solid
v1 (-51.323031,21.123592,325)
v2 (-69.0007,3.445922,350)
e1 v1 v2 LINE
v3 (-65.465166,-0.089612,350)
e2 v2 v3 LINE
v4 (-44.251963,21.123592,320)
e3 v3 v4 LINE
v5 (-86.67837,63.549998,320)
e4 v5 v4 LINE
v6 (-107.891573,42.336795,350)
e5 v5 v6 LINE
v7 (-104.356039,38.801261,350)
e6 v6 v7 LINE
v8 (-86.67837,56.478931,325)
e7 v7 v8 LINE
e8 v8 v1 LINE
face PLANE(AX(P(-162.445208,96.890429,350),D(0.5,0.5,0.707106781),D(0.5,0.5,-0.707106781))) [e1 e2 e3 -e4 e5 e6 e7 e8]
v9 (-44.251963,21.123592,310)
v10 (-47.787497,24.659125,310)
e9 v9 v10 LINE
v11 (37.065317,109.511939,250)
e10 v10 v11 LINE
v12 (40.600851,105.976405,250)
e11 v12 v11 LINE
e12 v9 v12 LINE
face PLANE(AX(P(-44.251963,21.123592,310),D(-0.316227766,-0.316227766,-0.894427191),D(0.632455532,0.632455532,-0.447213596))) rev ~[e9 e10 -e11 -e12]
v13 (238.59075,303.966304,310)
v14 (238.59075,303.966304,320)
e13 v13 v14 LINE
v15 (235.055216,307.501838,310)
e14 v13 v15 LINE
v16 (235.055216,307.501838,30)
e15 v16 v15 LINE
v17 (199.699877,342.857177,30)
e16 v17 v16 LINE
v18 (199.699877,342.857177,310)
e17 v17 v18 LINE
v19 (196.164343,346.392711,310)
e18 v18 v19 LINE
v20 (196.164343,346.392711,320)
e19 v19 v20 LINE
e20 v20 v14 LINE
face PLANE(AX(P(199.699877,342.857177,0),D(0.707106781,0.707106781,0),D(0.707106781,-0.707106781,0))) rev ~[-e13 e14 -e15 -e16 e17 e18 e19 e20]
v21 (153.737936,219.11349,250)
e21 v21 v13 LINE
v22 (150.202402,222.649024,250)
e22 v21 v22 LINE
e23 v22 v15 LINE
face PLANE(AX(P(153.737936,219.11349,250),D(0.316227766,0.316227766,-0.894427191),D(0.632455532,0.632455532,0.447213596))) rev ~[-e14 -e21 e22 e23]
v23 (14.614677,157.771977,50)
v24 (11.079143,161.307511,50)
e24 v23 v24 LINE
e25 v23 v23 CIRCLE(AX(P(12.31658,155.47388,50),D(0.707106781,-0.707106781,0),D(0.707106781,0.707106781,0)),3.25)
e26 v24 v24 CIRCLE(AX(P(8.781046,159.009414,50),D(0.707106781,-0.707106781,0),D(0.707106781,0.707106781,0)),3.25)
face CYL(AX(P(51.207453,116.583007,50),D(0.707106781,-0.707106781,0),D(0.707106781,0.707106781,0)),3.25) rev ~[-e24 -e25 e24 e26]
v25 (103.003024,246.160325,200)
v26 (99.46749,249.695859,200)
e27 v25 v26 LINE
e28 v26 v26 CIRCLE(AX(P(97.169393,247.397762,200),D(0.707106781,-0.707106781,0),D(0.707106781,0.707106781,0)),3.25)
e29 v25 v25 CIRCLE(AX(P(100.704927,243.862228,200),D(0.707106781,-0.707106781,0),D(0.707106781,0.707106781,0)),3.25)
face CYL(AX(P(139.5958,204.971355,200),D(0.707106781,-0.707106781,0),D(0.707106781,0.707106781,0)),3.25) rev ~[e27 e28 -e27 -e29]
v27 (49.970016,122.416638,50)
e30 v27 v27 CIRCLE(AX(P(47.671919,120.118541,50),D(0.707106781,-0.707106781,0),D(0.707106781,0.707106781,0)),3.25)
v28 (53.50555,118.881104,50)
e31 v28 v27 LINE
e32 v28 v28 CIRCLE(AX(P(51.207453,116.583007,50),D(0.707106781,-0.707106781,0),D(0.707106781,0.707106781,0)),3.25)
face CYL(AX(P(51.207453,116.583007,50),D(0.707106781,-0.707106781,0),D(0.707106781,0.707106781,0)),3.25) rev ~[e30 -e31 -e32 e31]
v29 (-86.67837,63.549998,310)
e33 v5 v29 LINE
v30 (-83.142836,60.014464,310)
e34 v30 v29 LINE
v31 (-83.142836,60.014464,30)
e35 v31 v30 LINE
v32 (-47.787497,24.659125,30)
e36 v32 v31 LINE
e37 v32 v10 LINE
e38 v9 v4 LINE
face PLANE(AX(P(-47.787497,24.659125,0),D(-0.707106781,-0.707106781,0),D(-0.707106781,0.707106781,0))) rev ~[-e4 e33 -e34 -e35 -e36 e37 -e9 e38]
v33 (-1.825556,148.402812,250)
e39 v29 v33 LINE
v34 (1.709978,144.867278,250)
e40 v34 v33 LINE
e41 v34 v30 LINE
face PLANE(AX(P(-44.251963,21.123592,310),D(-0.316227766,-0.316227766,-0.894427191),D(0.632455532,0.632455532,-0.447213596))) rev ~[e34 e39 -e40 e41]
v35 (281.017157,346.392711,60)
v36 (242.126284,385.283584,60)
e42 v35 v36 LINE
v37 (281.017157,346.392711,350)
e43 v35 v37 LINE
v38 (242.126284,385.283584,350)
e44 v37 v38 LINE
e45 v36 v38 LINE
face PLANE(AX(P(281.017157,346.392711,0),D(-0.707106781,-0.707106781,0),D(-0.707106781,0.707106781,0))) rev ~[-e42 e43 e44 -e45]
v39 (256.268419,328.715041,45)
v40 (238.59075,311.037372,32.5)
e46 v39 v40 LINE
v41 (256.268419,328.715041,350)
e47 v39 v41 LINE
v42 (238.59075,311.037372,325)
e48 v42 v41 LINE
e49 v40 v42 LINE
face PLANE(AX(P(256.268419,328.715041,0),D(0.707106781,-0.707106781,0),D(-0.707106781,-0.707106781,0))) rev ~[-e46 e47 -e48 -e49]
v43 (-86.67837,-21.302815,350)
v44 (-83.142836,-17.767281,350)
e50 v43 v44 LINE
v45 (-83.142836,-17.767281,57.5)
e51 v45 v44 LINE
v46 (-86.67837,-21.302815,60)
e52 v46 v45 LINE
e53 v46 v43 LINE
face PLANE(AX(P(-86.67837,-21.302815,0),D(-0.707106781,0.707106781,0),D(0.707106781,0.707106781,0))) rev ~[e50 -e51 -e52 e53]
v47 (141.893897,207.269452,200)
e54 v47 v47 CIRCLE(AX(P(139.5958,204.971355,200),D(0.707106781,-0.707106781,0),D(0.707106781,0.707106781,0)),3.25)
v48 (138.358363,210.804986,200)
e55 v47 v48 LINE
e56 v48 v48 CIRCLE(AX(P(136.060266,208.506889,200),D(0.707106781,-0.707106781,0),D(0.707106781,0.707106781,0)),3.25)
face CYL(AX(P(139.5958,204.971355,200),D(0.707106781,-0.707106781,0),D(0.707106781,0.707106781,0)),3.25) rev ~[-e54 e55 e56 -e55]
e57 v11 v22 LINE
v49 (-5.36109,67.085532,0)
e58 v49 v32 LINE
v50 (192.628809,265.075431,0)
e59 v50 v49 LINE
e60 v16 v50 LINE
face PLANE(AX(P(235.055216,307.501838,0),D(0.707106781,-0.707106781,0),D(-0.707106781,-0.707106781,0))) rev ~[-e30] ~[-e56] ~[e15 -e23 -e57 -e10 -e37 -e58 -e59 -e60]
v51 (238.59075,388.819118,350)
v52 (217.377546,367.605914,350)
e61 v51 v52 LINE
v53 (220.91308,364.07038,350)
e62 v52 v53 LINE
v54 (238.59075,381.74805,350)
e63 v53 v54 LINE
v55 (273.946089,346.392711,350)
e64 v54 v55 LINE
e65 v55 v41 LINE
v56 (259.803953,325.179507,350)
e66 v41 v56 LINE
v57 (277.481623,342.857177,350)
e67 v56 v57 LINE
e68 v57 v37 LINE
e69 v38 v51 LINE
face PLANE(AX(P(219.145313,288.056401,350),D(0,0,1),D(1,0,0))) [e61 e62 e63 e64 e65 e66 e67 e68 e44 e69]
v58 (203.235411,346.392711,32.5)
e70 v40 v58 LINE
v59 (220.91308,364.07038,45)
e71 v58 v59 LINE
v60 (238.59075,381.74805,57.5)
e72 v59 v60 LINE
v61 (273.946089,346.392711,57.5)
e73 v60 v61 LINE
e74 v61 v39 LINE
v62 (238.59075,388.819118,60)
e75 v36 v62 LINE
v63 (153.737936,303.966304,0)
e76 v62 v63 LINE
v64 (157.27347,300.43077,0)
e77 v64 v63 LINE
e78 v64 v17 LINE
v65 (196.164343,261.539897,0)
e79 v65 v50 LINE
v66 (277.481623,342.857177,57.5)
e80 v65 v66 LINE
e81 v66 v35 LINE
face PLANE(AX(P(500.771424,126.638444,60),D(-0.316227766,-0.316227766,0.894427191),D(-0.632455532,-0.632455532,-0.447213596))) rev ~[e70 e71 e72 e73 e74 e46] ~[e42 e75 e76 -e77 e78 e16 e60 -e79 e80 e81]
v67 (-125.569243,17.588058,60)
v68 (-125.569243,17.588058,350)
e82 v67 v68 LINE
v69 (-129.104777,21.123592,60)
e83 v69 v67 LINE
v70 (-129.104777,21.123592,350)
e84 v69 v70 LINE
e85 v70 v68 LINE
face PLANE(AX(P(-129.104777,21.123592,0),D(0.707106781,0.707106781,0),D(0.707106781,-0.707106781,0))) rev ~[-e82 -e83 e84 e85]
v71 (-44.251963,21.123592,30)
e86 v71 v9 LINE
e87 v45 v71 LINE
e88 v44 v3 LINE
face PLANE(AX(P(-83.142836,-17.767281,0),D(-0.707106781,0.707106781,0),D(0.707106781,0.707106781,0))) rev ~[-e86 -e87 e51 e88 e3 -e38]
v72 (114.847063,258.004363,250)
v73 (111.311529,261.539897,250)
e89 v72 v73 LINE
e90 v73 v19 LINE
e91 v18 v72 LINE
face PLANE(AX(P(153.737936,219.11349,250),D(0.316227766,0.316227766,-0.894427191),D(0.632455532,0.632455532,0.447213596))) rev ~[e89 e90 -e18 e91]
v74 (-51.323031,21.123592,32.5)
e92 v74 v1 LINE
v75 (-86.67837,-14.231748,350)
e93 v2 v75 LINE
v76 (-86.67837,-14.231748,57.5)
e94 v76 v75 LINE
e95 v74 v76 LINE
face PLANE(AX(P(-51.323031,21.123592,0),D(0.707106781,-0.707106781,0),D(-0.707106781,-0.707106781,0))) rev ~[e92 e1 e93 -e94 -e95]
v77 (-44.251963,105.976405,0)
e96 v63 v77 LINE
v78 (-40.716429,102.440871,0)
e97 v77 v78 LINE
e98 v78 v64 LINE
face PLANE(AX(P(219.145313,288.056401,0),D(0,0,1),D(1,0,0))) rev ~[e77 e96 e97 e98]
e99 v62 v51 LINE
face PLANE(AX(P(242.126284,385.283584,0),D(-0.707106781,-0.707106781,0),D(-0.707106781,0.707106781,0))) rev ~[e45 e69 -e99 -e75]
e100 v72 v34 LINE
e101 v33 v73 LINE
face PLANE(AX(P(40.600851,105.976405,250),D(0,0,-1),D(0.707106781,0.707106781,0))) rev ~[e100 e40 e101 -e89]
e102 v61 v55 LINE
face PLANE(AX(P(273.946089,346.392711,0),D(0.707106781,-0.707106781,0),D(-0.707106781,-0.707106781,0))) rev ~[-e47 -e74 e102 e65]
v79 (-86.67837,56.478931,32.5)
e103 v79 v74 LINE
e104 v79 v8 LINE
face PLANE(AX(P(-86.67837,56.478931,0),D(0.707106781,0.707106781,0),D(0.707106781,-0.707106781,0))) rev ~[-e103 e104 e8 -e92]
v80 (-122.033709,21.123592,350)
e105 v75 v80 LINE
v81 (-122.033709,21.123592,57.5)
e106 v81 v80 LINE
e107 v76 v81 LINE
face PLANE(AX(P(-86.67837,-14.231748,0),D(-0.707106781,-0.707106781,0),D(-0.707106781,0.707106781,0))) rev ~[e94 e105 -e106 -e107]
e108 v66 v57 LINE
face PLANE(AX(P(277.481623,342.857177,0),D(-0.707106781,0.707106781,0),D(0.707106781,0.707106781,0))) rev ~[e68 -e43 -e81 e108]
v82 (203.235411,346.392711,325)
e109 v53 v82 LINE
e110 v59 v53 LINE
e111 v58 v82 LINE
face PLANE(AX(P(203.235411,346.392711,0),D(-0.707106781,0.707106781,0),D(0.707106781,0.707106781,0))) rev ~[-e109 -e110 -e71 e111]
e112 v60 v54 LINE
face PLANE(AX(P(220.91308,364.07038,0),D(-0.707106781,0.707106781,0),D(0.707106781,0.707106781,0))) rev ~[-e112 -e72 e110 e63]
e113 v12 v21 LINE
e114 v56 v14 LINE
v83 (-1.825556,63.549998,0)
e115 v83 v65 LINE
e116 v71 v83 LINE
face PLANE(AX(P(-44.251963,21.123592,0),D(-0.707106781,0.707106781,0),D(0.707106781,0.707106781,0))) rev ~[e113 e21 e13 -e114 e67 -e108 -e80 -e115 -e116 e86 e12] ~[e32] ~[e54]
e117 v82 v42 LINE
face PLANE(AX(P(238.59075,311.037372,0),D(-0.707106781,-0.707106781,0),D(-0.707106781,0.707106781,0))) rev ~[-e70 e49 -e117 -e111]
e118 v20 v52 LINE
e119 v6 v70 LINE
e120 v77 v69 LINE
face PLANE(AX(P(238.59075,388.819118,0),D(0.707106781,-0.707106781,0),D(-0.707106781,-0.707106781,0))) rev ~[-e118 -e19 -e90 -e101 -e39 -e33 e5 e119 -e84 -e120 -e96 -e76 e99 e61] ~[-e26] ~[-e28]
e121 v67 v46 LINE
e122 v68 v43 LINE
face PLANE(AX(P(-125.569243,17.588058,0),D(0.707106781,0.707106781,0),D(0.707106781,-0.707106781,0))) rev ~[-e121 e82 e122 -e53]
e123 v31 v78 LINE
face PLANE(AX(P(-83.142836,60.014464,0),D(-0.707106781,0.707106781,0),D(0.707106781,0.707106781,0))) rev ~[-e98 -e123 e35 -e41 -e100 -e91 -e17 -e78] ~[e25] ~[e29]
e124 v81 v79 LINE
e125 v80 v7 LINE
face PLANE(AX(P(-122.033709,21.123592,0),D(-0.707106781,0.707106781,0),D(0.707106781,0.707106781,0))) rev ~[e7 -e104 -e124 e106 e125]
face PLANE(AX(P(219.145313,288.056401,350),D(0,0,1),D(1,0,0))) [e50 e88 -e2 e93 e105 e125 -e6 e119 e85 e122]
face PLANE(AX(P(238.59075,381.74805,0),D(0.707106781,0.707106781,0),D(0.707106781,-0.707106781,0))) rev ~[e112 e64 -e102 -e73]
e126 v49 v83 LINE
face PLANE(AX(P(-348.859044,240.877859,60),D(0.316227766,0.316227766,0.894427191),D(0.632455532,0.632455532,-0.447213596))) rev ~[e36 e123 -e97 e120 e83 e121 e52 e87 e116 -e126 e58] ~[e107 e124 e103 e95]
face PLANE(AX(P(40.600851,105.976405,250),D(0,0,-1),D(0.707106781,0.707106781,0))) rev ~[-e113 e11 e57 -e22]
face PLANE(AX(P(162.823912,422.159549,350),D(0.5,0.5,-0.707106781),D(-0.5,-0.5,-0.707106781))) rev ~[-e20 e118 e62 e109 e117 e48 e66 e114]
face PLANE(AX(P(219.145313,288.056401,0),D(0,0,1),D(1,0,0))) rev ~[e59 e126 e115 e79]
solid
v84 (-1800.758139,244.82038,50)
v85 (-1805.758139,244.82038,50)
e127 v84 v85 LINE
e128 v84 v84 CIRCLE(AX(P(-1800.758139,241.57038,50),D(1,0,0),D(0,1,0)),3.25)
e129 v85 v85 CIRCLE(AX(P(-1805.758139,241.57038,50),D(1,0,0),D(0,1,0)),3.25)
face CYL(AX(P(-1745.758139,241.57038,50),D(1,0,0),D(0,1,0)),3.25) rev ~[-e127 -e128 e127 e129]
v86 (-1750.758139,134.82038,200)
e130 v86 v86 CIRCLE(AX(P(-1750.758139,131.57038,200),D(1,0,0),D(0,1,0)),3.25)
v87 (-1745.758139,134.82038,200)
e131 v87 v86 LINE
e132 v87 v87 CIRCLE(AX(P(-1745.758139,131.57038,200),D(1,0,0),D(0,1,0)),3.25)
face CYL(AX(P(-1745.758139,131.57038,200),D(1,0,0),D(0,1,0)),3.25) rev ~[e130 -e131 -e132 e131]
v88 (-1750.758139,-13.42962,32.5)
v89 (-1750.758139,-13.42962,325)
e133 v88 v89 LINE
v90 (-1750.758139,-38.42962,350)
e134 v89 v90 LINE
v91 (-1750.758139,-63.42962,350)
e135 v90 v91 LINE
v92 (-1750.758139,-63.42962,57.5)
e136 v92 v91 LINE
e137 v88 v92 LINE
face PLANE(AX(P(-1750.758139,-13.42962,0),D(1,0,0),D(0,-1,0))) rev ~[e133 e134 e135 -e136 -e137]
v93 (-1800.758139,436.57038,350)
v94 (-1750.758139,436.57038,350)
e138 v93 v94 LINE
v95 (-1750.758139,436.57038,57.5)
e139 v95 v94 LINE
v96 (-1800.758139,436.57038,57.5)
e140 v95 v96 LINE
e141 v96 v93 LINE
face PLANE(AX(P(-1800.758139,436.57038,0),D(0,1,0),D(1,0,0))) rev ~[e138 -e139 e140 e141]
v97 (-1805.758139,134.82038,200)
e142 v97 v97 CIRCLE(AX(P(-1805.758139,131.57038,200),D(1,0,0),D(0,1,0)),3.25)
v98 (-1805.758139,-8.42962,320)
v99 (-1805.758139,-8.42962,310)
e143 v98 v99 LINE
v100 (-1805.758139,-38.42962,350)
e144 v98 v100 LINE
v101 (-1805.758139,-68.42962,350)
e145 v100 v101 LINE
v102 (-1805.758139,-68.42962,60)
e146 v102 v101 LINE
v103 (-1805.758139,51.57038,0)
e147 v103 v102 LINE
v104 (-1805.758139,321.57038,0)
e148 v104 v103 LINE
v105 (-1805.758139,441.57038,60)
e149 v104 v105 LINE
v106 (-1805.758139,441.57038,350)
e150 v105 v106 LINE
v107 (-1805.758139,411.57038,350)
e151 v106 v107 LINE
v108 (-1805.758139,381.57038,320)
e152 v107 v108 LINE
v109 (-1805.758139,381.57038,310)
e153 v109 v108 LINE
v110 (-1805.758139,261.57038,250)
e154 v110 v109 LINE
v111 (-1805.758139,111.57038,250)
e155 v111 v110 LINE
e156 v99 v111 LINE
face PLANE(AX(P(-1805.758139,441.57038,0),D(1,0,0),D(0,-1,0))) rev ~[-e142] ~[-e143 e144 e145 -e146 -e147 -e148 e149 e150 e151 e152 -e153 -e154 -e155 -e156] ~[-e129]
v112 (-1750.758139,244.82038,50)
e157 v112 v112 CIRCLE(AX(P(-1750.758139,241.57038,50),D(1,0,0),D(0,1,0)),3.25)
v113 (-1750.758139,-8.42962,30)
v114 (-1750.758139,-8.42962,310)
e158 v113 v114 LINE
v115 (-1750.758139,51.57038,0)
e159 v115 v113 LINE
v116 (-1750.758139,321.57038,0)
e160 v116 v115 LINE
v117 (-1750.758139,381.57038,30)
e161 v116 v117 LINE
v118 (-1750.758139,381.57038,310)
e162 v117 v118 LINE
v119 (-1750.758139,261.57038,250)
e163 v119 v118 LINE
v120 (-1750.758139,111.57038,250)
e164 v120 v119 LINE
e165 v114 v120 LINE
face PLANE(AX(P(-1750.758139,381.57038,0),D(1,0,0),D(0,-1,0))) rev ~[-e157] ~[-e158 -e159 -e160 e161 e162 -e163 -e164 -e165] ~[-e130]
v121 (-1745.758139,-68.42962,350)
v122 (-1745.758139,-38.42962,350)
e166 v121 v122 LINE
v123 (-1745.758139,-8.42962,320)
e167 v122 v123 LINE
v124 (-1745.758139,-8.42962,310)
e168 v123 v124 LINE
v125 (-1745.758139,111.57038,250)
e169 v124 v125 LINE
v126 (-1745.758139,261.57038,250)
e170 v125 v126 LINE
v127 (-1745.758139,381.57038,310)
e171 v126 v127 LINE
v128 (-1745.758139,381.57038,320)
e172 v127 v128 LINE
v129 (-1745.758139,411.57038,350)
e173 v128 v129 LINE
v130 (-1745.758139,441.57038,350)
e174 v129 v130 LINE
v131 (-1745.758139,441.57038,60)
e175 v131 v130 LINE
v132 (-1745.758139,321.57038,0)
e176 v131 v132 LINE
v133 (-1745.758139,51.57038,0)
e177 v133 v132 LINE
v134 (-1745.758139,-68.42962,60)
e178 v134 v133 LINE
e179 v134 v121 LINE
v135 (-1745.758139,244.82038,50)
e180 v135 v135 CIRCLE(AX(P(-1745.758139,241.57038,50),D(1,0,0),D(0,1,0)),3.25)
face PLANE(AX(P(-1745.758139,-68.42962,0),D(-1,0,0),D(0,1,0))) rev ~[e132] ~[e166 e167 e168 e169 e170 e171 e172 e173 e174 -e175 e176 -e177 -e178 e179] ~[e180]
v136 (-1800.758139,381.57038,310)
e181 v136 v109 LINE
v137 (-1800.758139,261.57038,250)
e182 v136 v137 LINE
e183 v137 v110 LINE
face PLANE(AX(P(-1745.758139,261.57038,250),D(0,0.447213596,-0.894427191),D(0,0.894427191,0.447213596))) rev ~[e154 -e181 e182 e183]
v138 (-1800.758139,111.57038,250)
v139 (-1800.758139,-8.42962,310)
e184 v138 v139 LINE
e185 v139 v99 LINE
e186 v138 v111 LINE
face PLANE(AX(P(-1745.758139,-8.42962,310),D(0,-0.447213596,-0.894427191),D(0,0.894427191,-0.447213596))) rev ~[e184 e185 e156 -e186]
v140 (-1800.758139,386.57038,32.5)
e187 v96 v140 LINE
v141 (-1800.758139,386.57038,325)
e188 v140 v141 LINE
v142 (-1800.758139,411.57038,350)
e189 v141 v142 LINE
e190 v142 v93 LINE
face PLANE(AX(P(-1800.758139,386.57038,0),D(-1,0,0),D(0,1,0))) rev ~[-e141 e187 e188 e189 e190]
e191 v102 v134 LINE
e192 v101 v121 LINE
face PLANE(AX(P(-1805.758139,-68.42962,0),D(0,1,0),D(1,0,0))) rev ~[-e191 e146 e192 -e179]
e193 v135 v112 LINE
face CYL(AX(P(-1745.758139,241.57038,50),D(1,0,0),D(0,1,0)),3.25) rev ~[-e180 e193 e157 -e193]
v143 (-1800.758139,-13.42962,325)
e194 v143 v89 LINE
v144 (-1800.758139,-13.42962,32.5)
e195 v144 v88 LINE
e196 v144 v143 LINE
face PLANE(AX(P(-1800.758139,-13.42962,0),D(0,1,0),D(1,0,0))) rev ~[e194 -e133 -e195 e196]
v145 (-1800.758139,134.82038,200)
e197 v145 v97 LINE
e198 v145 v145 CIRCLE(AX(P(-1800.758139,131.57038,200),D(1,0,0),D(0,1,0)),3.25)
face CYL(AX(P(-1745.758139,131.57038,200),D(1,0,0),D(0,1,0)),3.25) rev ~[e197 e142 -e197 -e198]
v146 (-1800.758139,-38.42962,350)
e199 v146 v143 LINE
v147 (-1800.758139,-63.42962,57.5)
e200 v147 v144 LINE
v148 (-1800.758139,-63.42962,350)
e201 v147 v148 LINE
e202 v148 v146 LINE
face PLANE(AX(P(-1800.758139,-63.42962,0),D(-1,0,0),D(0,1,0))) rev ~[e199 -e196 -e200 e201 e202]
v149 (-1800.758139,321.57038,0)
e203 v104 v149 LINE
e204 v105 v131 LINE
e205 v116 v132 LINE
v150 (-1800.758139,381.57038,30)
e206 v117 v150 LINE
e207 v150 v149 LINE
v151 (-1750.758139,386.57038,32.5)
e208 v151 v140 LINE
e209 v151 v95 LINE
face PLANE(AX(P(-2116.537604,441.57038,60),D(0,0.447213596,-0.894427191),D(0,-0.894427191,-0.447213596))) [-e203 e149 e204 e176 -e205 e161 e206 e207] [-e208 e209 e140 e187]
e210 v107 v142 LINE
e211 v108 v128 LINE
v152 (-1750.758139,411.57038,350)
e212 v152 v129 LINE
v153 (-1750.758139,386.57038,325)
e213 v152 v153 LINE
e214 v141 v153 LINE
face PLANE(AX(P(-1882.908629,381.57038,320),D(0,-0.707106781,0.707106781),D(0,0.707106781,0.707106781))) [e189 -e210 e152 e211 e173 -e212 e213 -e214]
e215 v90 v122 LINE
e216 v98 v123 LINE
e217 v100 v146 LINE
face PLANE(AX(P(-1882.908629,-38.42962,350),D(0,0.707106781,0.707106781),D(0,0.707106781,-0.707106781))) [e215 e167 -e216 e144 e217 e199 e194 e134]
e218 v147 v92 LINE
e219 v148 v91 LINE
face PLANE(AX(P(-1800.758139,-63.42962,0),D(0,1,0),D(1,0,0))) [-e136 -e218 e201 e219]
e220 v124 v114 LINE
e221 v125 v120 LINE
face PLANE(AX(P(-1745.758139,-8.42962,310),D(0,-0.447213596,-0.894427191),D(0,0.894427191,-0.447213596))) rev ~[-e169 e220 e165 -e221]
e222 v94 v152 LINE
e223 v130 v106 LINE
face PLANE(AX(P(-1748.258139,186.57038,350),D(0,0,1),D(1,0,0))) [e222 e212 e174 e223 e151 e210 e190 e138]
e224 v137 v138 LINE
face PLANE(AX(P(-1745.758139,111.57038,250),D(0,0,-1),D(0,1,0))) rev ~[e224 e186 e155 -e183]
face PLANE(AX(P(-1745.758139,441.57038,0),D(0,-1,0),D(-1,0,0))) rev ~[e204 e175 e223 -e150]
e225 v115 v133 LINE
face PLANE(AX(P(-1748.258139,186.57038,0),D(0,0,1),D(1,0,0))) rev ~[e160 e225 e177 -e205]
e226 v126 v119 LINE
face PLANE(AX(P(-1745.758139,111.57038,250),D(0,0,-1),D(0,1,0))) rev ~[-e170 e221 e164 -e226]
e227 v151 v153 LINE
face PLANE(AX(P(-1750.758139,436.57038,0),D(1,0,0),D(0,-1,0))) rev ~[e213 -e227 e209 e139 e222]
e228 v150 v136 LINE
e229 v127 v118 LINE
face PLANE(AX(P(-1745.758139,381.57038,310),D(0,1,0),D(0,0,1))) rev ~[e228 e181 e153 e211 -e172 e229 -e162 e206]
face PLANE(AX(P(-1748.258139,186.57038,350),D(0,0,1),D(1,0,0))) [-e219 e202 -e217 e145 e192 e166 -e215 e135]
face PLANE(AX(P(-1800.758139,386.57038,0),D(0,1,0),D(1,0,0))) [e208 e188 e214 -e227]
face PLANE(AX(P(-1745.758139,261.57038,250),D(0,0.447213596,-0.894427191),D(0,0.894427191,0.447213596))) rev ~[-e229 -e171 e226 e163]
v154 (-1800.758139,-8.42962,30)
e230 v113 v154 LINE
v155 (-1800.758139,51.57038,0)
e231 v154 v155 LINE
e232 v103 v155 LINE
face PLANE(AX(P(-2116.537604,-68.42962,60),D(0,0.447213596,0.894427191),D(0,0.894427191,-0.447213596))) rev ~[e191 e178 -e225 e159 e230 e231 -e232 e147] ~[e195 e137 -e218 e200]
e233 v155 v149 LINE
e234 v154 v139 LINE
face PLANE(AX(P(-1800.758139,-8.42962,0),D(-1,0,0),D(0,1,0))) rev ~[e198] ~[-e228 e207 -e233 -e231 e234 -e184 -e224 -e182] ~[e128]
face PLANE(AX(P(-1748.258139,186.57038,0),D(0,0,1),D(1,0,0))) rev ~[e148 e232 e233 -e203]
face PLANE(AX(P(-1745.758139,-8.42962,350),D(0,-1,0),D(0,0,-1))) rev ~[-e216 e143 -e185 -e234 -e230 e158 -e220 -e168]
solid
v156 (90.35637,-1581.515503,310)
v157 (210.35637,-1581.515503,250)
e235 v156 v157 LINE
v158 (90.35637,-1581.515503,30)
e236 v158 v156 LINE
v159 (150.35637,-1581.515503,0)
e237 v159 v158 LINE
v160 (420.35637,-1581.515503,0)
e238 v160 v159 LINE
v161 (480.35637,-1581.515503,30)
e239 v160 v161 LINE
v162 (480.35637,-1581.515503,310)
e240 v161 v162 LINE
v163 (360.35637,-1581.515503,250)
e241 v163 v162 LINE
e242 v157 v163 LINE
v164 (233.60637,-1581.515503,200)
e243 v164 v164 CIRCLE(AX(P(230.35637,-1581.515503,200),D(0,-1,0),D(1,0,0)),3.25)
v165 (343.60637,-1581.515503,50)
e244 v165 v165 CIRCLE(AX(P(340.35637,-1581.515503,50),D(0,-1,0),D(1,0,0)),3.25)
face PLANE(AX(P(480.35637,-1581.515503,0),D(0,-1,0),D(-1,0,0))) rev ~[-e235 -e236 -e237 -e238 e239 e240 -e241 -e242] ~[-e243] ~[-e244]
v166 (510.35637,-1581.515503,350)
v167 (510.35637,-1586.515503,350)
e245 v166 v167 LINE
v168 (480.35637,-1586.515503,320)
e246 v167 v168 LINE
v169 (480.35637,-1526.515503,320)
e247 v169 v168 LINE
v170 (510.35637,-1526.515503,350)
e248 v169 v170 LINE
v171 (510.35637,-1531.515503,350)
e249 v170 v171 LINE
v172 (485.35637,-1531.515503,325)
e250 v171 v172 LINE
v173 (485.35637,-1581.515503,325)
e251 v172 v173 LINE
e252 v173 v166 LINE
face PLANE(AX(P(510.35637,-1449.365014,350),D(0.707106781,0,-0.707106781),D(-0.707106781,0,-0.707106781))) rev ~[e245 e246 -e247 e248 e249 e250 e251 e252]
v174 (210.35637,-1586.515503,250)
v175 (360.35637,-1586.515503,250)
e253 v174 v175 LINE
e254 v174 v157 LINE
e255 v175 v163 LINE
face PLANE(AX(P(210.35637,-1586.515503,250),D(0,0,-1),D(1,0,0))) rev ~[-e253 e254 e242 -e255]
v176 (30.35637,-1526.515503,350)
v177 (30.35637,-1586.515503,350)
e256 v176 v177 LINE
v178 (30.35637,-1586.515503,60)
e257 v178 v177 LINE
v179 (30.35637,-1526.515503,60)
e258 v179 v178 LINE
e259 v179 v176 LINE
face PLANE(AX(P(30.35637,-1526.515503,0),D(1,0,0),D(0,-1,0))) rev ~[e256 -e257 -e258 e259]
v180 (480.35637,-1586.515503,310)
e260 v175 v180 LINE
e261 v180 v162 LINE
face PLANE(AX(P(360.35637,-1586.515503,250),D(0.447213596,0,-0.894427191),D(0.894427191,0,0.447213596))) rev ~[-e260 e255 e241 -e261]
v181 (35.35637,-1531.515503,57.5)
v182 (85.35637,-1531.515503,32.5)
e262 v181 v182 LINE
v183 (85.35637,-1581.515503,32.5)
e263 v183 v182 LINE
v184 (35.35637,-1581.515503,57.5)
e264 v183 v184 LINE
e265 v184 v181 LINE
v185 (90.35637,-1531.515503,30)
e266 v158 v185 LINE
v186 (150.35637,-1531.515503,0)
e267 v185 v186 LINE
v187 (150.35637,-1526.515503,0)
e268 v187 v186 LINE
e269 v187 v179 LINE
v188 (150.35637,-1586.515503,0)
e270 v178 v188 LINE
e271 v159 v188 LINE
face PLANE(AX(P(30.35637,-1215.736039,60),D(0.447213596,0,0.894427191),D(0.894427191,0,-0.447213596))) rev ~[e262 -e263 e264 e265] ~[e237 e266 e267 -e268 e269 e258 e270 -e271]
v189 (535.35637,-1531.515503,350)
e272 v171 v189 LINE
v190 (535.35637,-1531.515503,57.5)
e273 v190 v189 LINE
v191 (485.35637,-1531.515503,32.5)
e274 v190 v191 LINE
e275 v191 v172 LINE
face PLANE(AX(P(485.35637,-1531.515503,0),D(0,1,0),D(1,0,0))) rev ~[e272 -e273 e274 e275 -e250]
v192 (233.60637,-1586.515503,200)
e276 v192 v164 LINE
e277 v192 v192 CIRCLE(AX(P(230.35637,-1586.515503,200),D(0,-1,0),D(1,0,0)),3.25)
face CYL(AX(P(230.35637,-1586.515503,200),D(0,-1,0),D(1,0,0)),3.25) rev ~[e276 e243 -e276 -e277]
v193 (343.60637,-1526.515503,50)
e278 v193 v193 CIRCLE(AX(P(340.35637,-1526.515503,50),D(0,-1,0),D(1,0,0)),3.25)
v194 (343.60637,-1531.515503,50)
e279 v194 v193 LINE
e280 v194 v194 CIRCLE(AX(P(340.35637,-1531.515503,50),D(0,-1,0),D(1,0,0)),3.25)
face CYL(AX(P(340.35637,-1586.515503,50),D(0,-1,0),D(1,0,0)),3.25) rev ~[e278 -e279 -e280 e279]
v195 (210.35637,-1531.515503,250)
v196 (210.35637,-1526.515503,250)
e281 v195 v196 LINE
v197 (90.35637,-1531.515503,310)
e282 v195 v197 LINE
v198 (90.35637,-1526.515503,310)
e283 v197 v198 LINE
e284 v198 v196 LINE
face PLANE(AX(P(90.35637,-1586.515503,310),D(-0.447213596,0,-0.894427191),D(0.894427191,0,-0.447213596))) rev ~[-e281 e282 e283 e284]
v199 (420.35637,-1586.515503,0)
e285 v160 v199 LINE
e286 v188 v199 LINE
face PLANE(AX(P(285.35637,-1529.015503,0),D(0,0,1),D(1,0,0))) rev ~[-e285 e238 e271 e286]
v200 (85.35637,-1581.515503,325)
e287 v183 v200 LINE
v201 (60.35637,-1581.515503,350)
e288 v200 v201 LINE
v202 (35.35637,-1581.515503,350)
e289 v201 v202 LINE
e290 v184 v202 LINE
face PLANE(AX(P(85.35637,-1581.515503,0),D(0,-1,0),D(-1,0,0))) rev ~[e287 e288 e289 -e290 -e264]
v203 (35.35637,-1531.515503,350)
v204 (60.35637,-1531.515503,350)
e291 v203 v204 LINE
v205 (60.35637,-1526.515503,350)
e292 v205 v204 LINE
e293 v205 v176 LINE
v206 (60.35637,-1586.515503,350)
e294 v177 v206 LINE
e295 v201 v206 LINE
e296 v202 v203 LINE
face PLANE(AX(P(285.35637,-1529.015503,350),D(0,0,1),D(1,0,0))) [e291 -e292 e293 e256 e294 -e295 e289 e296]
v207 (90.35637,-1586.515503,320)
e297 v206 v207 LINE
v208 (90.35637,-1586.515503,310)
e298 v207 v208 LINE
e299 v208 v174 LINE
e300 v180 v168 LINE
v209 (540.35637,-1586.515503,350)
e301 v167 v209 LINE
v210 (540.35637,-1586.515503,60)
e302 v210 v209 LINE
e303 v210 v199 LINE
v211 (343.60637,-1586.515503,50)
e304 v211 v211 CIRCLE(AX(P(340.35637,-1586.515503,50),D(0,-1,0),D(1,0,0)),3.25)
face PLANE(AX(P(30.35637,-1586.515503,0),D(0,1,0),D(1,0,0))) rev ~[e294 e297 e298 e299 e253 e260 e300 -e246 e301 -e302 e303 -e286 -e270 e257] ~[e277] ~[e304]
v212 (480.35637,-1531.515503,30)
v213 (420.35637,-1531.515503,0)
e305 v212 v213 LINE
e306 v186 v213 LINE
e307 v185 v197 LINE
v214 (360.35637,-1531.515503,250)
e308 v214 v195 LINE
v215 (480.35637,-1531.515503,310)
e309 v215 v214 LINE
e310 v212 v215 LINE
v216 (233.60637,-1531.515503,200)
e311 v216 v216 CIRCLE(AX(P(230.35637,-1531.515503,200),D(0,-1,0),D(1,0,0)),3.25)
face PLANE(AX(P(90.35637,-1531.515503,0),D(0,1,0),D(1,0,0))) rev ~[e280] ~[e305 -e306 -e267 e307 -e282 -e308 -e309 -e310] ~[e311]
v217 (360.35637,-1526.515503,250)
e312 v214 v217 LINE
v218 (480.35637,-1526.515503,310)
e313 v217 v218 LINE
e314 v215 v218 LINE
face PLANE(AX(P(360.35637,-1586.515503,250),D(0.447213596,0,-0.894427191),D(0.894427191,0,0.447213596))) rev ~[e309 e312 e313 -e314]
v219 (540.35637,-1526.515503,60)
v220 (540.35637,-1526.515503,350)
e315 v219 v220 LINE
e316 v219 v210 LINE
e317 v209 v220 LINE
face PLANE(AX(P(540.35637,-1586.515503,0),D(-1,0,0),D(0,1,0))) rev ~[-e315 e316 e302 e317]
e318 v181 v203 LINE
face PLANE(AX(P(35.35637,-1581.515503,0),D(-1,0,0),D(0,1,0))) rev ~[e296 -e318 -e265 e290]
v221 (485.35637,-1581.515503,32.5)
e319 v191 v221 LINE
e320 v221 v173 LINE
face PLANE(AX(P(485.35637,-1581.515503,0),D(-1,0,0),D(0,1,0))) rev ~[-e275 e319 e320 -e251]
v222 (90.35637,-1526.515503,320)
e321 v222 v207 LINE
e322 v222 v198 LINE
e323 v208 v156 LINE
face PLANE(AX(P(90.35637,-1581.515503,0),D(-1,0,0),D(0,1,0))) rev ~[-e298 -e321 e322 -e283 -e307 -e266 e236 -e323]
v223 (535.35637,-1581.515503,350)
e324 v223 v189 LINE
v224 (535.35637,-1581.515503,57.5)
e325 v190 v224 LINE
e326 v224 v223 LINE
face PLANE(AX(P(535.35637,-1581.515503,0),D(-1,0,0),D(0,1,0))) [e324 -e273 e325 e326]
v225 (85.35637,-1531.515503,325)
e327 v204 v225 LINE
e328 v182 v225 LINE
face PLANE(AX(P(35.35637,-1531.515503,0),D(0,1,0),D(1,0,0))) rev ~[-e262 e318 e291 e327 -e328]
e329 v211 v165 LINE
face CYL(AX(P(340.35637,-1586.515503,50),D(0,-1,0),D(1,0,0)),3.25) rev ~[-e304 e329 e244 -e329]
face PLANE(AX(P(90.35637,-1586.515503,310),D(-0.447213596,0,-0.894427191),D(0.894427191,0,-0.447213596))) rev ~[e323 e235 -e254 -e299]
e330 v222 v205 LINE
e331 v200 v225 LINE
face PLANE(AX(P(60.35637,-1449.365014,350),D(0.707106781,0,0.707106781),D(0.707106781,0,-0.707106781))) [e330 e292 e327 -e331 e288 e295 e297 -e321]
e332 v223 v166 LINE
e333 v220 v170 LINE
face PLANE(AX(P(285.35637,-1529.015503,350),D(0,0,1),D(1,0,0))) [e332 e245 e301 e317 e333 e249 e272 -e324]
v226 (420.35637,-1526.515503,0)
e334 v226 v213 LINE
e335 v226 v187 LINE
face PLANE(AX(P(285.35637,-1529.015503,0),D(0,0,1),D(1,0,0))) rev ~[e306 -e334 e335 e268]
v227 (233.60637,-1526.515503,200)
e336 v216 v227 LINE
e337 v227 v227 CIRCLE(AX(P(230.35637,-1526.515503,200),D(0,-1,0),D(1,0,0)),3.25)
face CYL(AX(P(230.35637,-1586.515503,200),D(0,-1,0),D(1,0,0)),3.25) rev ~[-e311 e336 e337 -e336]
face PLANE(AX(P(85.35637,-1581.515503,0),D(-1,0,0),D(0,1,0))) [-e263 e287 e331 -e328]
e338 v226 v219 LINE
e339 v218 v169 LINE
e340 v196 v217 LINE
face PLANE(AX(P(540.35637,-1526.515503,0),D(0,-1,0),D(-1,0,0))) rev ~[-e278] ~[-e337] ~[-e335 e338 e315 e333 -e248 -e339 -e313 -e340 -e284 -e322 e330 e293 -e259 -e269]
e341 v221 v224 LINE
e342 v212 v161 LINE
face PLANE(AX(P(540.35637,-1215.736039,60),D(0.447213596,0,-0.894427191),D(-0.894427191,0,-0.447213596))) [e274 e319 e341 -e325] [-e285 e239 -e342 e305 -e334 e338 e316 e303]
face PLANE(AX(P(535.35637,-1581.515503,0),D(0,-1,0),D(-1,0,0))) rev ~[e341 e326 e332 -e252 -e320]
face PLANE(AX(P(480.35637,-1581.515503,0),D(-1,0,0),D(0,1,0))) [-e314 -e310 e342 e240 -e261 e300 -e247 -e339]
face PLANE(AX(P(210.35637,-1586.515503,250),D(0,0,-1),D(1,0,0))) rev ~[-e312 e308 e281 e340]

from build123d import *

# Parameters (mm, degrees)
F0_W          = 390
F0_H          = 5
F0_W_2        = 5
F0_H_2        = 50
F1_DEPTH      = 350
F0_H_3        = 390
F0_W_3        = 50
F2_R          = 3.25
F3_DEPTH      = 100
F4_R          = 3.25
F5_DEPTH      = 100
F6_R          = 3.25
F7_DEPTH      = 100
F8_T1_DEPTH   = 681.5589297088
F8_2_T1_DEPTH = 681.5589297088
F8_2_T3_DEPTH = 681.5589297088
F8_3_T1_DEPTH = 681.5589297088
F9_T1_DEPTH   = 214.3009792779
F9_2_T1_DEPTH = 214.300979278
F9_3_T1_DEPTH = 214.300979278


# Not quite as in the source:
# - a fillet or chamfer that OpenCascade refuses, or shapes differently, is made with other operations: its cross-section is extruded or revolved along the edge and cut away or added


with BuildPart() as f1:
    # F0 (on Top) → F1 (new body)
    with BuildSketch(Plane.XY):
        Polygon((90.3563703896, -1526.5155034513), (90.3563703896, -1531.5155034513), (480.3563703896, -1531.5155034513), (480.3563703896, -1526.5155034513), (460.3563703896, -1526.5155034513), (410.3563703896, -1526.5155034513), (160.3563703896, -1526.5155034513), (110.3563703896, -1526.5155034513), align=None)
        with Locations((285.3563703896, -1584.0155034513)):
            Rectangle(F0_W, F0_H)
        with Locations((87.8563703896, -1556.5155034513)):
            Rectangle(F0_W_2, F0_H_2)
        Polygon((30.3563703896, -1526.5155034513), (30.3563703896, -1531.5155034513), (35.3563703896, -1531.5155034513), (85.3563703896, -1531.5155034513), (90.3563703896, -1531.5155034513), (90.3563703896, -1526.5155034513), align=None)
        with Locations((32.8563703896, -1556.5155034513)):
            Rectangle(F0_W_2, F0_H_2)
        Polygon((30.3563703896, -1581.5155034513), (30.3563703896, -1586.5155034513), (90.3563703896, -1586.5155034513), (90.3563703896, -1581.5155034513), (85.3563703896, -1581.5155034513), (35.3563703896, -1581.5155034513), align=None)
        Polygon((480.3563703896, -1581.5155034513), (480.3563703896, -1586.5155034513), (540.3563703896, -1586.5155034513), (540.3563703896, -1581.5155034513), (535.3563703896, -1581.5155034513), (485.3563703896, -1581.5155034513), align=None)
        with Locations((482.8563703896, -1556.5155034513)):
            Rectangle(F0_W_2, F0_H_2)
        Polygon((480.3563703896, -1526.5155034513), (480.3563703896, -1531.5155034513), (485.3563703896, -1531.5155034513), (535.3563703896, -1531.5155034513), (540.3563703896, -1531.5155034513), (540.3563703896, -1526.5155034513), align=None)
        with Locations((537.8563703896, -1556.5155034513)):
            Rectangle(F0_W_2, F0_H_2)
    extrude(amount=F1_DEPTH)

    # F6 (on face) → F7 (cut)
    with BuildSketch(Plane.XZ.offset(1586.5155034513)):
        with Locations((230.3563703896, 200)):
            Circle(F6_R)
        with Locations((340.3563703896, 50)):
            Circle(F6_R)
        Polygon((480.3563703896, 350), (90.3563703896, 350), (90.3563703896, 310), (210.3563703896, 250), (360.3563703896, 250), (480.3563703896, 310), align=None)
    extrude(amount=-F7_DEPTH, mode=Mode.SUBTRACT)

    # F8: chamfer of 60 x 120 on 2 edges, made by hand

    # F8_s2 → F8_t1 (cut)
    with BuildSketch(Plane.XZ.offset(1215.7360385969)):
        Polygon((540.3563703896, 60), (420.3563703896, 0), (540.3563703896, 0), align=None)
        Polygon((30.3563703896, 60), (150.3563703896, 0), (30.3563703896, 0), align=None)
    extrude(amount=F8_T1_DEPTH, mode=Mode.SUBTRACT)

    # F9: chamfer of 30 on 2 edges, made by hand

    # F9_s2 → F9_t1 (cut)
    with BuildSketch(Plane.XZ.offset(1449.3650138123)):
        Polygon((510.3563703896, 350), (480.3563703896, 320), (480.3563703896, 350), align=None)
        Polygon((60.3563703896, 350), (90.3563703896, 320), (90.3563703896, 350), align=None)
    extrude(amount=F9_T1_DEPTH, mode=Mode.SUBTRACT)


with BuildPart() as f1b:
    # F0 (on Top) → F1, piece 2 (new body)
    with BuildSketch(Plane.XY):
        Polygon((215.6097792881, 288.056401427), (219.145313194, 284.520867521), (222.6808471, 288.056401427), (219.145313194, 291.5919353329), align=None)
        Polygon((197.9321097584, 270.3787318973), (201.4676436644, 266.8431979914), (219.145313194, 284.520867521), (215.6097792881, 288.056401427), align=None)
        Polygon((176.7189063228, 326.9472743922), (159.0412367932, 309.2696048626), (162.5767706991, 305.7340709566), (180.2544402288, 323.4117404863), align=None)
        Polygon((180.2544402288, 330.4828082982), (176.7189063228, 326.9472743922), (180.2544402288, 323.4117404863), (183.7899741347, 326.9472743922), align=None)
        Polygon((-44.251962798, 21.1235915291), (201.4676436644, 266.8431979914), (197.9321097584, 270.3787318973), (-47.7874967039, 24.659125435), align=None)
        Polygon((162.5767706991, 305.7340709566), (159.0412367932, 309.2696048626), (-86.6783696692, 63.5499984002), (-83.1428357632, 60.0144644943), align=None)
        Polygon((196.1643428055, 346.3927108749), (180.2544402288, 330.4828082982), (183.7899741347, 326.9472743922), (199.6998767114, 342.8571769689), align=None)
        Polygon((219.145313194, 291.5919353329), (222.6808471, 288.056401427), (238.5907496767, 303.9663040037), (235.0552157707, 307.5018379096), align=None)
        Polygon((-47.7874967039, 24.659125435), (-83.1428357632, 60.0144644943), (-86.6783696692, 56.4789305884), (-51.3230306098, 21.123591529), align=None)
        Polygon((-86.6783696692, 63.5499984002), (-125.5692426344, 24.659125435), (-122.0337087285, 21.123591529), (-86.6783696692, 56.4789305884), (-83.1428357632, 60.0144644943), align=None)
        Polygon((-122.0337087285, 21.123591529), (-125.5692426344, 17.5880576231), (-90.2139035751, -17.7672814362), (-86.6783696692, -14.2317475303), align=None)
        Polygon((-125.5692426344, 24.659125435), (-129.1047765404, 21.123591529), (-125.5692426344, 17.5880576231), (-122.0337087285, 21.123591529), align=None)
        Polygon((-90.2139035751, -17.7672814362), (-86.6783696692, -21.3028153421), (-83.1428357632, -17.7672814362), (-86.6783696692, -14.2317475303), align=None)
        Polygon((-86.6783696692, -14.2317475303), (-83.1428357632, -17.7672814362), (-44.251962798, 21.1235915291), (-47.7874967039, 24.659125435), (-51.3230306098, 21.123591529), align=None)
        Polygon((235.0552157707, 385.2835838401), (196.1643428055, 346.3927108749), (199.6998767114, 342.8571769689), (203.2354106173, 346.3927108749), (220.913080147, 364.0703804045), (238.5907496767, 381.7480499342), align=None)
        Polygon((203.2354106173, 346.3927108749), (199.6998767114, 342.8571769689), (235.0552157707, 307.5018379096), (238.5907496767, 311.0373718155), align=None)
        Polygon((235.0552157707, 307.5018379096), (238.5907496767, 303.9663040037), (277.4816226419, 342.8571769689), (273.946088736, 346.3927108749), (256.2684192063, 328.7150413452), (238.5907496767, 311.0373718155), align=None)
        Polygon((273.946088736, 346.3927108749), (277.4816226419, 342.8571769689), (281.0171565478, 346.3927108749), (277.4816226419, 349.9282447808), align=None)
        Polygon((242.1262835826, 385.2835838401), (238.5907496767, 381.7480499342), (273.946088736, 346.3927108749), (277.4816226419, 349.9282447808), align=None)
        Polygon((238.5907496767, 388.8191177461), (235.0552157707, 385.2835838401), (238.5907496767, 381.7480499342), (242.1262835826, 385.2835838401), align=None)
    extrude(amount=F1_DEPTH)

    # F2 (on face) → F3 (cut)
    with BuildSketch(Plane(origin=(-32.6877771635, 32.6877771635, 0), x_dir=(0.7071067812, 0.7071067812, 0), z_dir=(0.7071067812, -0.7071067812, 0))):
        with Locations((118.6457718379, 50)):
            Circle(F2_R)
        with Locations((243.6457718379, 200)):
            Circle(F2_R)
        Polygon((383.6457718379, 350), (-16.3542281621, 350), (-16.3542281621, 310), (103.6457718379, 250), (263.6457718379, 250), (383.6457718379, 310), align=None)
    extrude(amount=-F3_DEPTH, mode=Mode.SUBTRACT)

    # F8#2: chamfer of 60 x 120 on 2 edges, made by hand

    # F8_2_s2 → F8_2_t1 (cut)
    with BuildSketch(Plane(origin=(187.0664898886, -187.0664898886, 0), x_dir=(0, 0, 1), z_dir=(-0.7071067812, 0.7071067812, 0))):
        Polygon((60, 443.6457718379), (0, 323.6457718379), (0, 443.6457718379), align=None)
    extrude(amount=F8_2_T1_DEPTH, mode=Mode.SUBTRACT)

    # F8_2_s4 → F8_2_t3 (cut)
    with BuildSketch(Plane(origin=(-294.8684510868, 294.8684510868, 0), x_dir=(0, 0, 1), z_dir=(0.7071067812, -0.7071067812, 0))):
        Polygon((60, 76.3542281621), (0, -43.6457718379), (0, 76.3542281621), align=None)
    extrude(amount=F8_2_T3_DEPTH, mode=Mode.SUBTRACT)

    # F9#2: chamfer of 30 on 2 edges, made by hand

    # F9_2_s2 → F9_2_t1 (cut)
    with BuildSketch(Plane(origin=(-129.6678184303, 129.6678184303, 0), x_dir=(0, 0, 1), z_dir=(0.7071067812, -0.7071067812, 0))):
        Polygon((350, 46.3542281621), (320, 16.3542281621), (350, 16.3542281621), align=None)
        Polygon((350, -413.6457718379), (320, -383.6457718379), (350, -383.6457718379), align=None)
    extrude(amount=F9_2_T1_DEPTH, mode=Mode.SUBTRACT)


with BuildPart() as f1c:
    # F0 (on Top) → F1, piece 3 (new body)
    with BuildSketch(Plane.XY):
        Polygon((-1745.7581393137, -8.4296195955), (-1745.7581393137, 11.5703804045), (-1745.7581393137, 49.0703804045), (-1745.7581393137, 61.5703804045), (-1745.7581393137, 311.5703804045), (-1745.7581393137, 324.0703804045), (-1745.7581393137, 349.0703804045), (-1745.7581393137, 361.5703804045), (-1745.7581393137, 381.5703804045), (-1750.7581393137, 381.5703804045), (-1750.7581393137, -8.4296195955), align=None)
        with Locations((-1803.2581393137, 186.5703804045)):
            Rectangle(F0_W_2, F0_H_3)
        Polygon((-1805.7581393137, 381.5703804045), (-1800.7581393137, 381.5703804045), (-1800.7581393137, 386.5703804045), (-1800.7581393137, 436.5703804045), (-1800.7581393137, 441.5703804045), (-1805.7581393137, 441.5703804045), align=None)
        with Locations((-1775.7581393137, 439.0703804045)):
            Rectangle(F0_W_3, F0_H)
        Polygon((-1750.7581393137, 381.5703804045), (-1745.7581393137, 381.5703804045), (-1745.7581393137, 441.5703804045), (-1750.7581393137, 441.5703804045), (-1750.7581393137, 436.5703804045), (-1750.7581393137, 386.5703804045), align=None)
        with Locations((-1775.7581393137, 384.0703804045)):
            Rectangle(F0_W_3, F0_H)
        Polygon((-1800.7581393137, -13.4296195955), (-1800.7581393137, -8.4296195955), (-1805.7581393137, -8.4296195955), (-1805.7581393137, -63.4296195955), (-1800.7581393137, -63.4296195955), align=None)
        with Locations((-1775.7581393137, -10.9296195955)):
            Rectangle(F0_W_3, F0_H)
        Polygon((-1745.7581393137, -63.4296195955), (-1745.7581393137, -8.4296195955), (-1750.7581393137, -8.4296195955), (-1750.7581393137, -13.4296195955), (-1750.7581393137, -63.4296195955), align=None)
        with Locations((-1748.2581393137, -65.9296195955)):
            Rectangle(F0_W_2, F0_H)
        with Locations((-1775.7581393137, -65.9296195955)):
            Rectangle(F0_W_3, F0_H)
        with Locations((-1803.2581393137, -65.9296195955)):
            Rectangle(F0_W_2, F0_H)
    extrude(amount=F1_DEPTH)

    # F4 (on face) → F5 (cut)
    with BuildSketch(Plane.YZ.offset(-1745.7581393137)):
        with Locations((131.5703804045, 200)):
            Circle(F4_R)
        with Locations((241.5703804045, 50)):
            Circle(F4_R)
        Polygon((381.5703804045, 310), (381.5703804045, 350), (-8.4296195955, 350), (-8.4296195955, 310), (111.5703804045, 250), (261.5703804045, 250), align=None)
    extrude(amount=-F5_DEPTH, mode=Mode.SUBTRACT)

    # F8#3: chamfer of 60 x 120 on 2 edges, made by hand

    # F8_3_s2 → F8_3_t1 (cut)
    with BuildSketch(Plane.YZ.offset(-2116.5376041681)):
        Polygon((441.5703804045, 60), (321.5703804045, 0), (441.5703804045, 0), align=None)
        Polygon((-68.4296195955, 60), (51.5703804045, 0), (-68.4296195955, 0), align=None)
    extrude(amount=F8_3_T1_DEPTH, mode=Mode.SUBTRACT)

    # F9#3: chamfer of 30 on 2 edges, made by hand

    # F9_3_s2 → F9_3_t1 (cut)
    with BuildSketch(Plane.YZ.offset(-1882.9086289527)):
        Polygon((-38.4296195955, 350), (-8.4296195955, 320), (-8.4296195955, 350), align=None)
        Polygon((381.5703804045, 320), (411.5703804045, 350), (381.5703804045, 350), align=None)
    extrude(amount=F9_3_T1_DEPTH, mode=Mode.SUBTRACT)


solid = Compound([f1.part, f1b.part, f1c.part])
